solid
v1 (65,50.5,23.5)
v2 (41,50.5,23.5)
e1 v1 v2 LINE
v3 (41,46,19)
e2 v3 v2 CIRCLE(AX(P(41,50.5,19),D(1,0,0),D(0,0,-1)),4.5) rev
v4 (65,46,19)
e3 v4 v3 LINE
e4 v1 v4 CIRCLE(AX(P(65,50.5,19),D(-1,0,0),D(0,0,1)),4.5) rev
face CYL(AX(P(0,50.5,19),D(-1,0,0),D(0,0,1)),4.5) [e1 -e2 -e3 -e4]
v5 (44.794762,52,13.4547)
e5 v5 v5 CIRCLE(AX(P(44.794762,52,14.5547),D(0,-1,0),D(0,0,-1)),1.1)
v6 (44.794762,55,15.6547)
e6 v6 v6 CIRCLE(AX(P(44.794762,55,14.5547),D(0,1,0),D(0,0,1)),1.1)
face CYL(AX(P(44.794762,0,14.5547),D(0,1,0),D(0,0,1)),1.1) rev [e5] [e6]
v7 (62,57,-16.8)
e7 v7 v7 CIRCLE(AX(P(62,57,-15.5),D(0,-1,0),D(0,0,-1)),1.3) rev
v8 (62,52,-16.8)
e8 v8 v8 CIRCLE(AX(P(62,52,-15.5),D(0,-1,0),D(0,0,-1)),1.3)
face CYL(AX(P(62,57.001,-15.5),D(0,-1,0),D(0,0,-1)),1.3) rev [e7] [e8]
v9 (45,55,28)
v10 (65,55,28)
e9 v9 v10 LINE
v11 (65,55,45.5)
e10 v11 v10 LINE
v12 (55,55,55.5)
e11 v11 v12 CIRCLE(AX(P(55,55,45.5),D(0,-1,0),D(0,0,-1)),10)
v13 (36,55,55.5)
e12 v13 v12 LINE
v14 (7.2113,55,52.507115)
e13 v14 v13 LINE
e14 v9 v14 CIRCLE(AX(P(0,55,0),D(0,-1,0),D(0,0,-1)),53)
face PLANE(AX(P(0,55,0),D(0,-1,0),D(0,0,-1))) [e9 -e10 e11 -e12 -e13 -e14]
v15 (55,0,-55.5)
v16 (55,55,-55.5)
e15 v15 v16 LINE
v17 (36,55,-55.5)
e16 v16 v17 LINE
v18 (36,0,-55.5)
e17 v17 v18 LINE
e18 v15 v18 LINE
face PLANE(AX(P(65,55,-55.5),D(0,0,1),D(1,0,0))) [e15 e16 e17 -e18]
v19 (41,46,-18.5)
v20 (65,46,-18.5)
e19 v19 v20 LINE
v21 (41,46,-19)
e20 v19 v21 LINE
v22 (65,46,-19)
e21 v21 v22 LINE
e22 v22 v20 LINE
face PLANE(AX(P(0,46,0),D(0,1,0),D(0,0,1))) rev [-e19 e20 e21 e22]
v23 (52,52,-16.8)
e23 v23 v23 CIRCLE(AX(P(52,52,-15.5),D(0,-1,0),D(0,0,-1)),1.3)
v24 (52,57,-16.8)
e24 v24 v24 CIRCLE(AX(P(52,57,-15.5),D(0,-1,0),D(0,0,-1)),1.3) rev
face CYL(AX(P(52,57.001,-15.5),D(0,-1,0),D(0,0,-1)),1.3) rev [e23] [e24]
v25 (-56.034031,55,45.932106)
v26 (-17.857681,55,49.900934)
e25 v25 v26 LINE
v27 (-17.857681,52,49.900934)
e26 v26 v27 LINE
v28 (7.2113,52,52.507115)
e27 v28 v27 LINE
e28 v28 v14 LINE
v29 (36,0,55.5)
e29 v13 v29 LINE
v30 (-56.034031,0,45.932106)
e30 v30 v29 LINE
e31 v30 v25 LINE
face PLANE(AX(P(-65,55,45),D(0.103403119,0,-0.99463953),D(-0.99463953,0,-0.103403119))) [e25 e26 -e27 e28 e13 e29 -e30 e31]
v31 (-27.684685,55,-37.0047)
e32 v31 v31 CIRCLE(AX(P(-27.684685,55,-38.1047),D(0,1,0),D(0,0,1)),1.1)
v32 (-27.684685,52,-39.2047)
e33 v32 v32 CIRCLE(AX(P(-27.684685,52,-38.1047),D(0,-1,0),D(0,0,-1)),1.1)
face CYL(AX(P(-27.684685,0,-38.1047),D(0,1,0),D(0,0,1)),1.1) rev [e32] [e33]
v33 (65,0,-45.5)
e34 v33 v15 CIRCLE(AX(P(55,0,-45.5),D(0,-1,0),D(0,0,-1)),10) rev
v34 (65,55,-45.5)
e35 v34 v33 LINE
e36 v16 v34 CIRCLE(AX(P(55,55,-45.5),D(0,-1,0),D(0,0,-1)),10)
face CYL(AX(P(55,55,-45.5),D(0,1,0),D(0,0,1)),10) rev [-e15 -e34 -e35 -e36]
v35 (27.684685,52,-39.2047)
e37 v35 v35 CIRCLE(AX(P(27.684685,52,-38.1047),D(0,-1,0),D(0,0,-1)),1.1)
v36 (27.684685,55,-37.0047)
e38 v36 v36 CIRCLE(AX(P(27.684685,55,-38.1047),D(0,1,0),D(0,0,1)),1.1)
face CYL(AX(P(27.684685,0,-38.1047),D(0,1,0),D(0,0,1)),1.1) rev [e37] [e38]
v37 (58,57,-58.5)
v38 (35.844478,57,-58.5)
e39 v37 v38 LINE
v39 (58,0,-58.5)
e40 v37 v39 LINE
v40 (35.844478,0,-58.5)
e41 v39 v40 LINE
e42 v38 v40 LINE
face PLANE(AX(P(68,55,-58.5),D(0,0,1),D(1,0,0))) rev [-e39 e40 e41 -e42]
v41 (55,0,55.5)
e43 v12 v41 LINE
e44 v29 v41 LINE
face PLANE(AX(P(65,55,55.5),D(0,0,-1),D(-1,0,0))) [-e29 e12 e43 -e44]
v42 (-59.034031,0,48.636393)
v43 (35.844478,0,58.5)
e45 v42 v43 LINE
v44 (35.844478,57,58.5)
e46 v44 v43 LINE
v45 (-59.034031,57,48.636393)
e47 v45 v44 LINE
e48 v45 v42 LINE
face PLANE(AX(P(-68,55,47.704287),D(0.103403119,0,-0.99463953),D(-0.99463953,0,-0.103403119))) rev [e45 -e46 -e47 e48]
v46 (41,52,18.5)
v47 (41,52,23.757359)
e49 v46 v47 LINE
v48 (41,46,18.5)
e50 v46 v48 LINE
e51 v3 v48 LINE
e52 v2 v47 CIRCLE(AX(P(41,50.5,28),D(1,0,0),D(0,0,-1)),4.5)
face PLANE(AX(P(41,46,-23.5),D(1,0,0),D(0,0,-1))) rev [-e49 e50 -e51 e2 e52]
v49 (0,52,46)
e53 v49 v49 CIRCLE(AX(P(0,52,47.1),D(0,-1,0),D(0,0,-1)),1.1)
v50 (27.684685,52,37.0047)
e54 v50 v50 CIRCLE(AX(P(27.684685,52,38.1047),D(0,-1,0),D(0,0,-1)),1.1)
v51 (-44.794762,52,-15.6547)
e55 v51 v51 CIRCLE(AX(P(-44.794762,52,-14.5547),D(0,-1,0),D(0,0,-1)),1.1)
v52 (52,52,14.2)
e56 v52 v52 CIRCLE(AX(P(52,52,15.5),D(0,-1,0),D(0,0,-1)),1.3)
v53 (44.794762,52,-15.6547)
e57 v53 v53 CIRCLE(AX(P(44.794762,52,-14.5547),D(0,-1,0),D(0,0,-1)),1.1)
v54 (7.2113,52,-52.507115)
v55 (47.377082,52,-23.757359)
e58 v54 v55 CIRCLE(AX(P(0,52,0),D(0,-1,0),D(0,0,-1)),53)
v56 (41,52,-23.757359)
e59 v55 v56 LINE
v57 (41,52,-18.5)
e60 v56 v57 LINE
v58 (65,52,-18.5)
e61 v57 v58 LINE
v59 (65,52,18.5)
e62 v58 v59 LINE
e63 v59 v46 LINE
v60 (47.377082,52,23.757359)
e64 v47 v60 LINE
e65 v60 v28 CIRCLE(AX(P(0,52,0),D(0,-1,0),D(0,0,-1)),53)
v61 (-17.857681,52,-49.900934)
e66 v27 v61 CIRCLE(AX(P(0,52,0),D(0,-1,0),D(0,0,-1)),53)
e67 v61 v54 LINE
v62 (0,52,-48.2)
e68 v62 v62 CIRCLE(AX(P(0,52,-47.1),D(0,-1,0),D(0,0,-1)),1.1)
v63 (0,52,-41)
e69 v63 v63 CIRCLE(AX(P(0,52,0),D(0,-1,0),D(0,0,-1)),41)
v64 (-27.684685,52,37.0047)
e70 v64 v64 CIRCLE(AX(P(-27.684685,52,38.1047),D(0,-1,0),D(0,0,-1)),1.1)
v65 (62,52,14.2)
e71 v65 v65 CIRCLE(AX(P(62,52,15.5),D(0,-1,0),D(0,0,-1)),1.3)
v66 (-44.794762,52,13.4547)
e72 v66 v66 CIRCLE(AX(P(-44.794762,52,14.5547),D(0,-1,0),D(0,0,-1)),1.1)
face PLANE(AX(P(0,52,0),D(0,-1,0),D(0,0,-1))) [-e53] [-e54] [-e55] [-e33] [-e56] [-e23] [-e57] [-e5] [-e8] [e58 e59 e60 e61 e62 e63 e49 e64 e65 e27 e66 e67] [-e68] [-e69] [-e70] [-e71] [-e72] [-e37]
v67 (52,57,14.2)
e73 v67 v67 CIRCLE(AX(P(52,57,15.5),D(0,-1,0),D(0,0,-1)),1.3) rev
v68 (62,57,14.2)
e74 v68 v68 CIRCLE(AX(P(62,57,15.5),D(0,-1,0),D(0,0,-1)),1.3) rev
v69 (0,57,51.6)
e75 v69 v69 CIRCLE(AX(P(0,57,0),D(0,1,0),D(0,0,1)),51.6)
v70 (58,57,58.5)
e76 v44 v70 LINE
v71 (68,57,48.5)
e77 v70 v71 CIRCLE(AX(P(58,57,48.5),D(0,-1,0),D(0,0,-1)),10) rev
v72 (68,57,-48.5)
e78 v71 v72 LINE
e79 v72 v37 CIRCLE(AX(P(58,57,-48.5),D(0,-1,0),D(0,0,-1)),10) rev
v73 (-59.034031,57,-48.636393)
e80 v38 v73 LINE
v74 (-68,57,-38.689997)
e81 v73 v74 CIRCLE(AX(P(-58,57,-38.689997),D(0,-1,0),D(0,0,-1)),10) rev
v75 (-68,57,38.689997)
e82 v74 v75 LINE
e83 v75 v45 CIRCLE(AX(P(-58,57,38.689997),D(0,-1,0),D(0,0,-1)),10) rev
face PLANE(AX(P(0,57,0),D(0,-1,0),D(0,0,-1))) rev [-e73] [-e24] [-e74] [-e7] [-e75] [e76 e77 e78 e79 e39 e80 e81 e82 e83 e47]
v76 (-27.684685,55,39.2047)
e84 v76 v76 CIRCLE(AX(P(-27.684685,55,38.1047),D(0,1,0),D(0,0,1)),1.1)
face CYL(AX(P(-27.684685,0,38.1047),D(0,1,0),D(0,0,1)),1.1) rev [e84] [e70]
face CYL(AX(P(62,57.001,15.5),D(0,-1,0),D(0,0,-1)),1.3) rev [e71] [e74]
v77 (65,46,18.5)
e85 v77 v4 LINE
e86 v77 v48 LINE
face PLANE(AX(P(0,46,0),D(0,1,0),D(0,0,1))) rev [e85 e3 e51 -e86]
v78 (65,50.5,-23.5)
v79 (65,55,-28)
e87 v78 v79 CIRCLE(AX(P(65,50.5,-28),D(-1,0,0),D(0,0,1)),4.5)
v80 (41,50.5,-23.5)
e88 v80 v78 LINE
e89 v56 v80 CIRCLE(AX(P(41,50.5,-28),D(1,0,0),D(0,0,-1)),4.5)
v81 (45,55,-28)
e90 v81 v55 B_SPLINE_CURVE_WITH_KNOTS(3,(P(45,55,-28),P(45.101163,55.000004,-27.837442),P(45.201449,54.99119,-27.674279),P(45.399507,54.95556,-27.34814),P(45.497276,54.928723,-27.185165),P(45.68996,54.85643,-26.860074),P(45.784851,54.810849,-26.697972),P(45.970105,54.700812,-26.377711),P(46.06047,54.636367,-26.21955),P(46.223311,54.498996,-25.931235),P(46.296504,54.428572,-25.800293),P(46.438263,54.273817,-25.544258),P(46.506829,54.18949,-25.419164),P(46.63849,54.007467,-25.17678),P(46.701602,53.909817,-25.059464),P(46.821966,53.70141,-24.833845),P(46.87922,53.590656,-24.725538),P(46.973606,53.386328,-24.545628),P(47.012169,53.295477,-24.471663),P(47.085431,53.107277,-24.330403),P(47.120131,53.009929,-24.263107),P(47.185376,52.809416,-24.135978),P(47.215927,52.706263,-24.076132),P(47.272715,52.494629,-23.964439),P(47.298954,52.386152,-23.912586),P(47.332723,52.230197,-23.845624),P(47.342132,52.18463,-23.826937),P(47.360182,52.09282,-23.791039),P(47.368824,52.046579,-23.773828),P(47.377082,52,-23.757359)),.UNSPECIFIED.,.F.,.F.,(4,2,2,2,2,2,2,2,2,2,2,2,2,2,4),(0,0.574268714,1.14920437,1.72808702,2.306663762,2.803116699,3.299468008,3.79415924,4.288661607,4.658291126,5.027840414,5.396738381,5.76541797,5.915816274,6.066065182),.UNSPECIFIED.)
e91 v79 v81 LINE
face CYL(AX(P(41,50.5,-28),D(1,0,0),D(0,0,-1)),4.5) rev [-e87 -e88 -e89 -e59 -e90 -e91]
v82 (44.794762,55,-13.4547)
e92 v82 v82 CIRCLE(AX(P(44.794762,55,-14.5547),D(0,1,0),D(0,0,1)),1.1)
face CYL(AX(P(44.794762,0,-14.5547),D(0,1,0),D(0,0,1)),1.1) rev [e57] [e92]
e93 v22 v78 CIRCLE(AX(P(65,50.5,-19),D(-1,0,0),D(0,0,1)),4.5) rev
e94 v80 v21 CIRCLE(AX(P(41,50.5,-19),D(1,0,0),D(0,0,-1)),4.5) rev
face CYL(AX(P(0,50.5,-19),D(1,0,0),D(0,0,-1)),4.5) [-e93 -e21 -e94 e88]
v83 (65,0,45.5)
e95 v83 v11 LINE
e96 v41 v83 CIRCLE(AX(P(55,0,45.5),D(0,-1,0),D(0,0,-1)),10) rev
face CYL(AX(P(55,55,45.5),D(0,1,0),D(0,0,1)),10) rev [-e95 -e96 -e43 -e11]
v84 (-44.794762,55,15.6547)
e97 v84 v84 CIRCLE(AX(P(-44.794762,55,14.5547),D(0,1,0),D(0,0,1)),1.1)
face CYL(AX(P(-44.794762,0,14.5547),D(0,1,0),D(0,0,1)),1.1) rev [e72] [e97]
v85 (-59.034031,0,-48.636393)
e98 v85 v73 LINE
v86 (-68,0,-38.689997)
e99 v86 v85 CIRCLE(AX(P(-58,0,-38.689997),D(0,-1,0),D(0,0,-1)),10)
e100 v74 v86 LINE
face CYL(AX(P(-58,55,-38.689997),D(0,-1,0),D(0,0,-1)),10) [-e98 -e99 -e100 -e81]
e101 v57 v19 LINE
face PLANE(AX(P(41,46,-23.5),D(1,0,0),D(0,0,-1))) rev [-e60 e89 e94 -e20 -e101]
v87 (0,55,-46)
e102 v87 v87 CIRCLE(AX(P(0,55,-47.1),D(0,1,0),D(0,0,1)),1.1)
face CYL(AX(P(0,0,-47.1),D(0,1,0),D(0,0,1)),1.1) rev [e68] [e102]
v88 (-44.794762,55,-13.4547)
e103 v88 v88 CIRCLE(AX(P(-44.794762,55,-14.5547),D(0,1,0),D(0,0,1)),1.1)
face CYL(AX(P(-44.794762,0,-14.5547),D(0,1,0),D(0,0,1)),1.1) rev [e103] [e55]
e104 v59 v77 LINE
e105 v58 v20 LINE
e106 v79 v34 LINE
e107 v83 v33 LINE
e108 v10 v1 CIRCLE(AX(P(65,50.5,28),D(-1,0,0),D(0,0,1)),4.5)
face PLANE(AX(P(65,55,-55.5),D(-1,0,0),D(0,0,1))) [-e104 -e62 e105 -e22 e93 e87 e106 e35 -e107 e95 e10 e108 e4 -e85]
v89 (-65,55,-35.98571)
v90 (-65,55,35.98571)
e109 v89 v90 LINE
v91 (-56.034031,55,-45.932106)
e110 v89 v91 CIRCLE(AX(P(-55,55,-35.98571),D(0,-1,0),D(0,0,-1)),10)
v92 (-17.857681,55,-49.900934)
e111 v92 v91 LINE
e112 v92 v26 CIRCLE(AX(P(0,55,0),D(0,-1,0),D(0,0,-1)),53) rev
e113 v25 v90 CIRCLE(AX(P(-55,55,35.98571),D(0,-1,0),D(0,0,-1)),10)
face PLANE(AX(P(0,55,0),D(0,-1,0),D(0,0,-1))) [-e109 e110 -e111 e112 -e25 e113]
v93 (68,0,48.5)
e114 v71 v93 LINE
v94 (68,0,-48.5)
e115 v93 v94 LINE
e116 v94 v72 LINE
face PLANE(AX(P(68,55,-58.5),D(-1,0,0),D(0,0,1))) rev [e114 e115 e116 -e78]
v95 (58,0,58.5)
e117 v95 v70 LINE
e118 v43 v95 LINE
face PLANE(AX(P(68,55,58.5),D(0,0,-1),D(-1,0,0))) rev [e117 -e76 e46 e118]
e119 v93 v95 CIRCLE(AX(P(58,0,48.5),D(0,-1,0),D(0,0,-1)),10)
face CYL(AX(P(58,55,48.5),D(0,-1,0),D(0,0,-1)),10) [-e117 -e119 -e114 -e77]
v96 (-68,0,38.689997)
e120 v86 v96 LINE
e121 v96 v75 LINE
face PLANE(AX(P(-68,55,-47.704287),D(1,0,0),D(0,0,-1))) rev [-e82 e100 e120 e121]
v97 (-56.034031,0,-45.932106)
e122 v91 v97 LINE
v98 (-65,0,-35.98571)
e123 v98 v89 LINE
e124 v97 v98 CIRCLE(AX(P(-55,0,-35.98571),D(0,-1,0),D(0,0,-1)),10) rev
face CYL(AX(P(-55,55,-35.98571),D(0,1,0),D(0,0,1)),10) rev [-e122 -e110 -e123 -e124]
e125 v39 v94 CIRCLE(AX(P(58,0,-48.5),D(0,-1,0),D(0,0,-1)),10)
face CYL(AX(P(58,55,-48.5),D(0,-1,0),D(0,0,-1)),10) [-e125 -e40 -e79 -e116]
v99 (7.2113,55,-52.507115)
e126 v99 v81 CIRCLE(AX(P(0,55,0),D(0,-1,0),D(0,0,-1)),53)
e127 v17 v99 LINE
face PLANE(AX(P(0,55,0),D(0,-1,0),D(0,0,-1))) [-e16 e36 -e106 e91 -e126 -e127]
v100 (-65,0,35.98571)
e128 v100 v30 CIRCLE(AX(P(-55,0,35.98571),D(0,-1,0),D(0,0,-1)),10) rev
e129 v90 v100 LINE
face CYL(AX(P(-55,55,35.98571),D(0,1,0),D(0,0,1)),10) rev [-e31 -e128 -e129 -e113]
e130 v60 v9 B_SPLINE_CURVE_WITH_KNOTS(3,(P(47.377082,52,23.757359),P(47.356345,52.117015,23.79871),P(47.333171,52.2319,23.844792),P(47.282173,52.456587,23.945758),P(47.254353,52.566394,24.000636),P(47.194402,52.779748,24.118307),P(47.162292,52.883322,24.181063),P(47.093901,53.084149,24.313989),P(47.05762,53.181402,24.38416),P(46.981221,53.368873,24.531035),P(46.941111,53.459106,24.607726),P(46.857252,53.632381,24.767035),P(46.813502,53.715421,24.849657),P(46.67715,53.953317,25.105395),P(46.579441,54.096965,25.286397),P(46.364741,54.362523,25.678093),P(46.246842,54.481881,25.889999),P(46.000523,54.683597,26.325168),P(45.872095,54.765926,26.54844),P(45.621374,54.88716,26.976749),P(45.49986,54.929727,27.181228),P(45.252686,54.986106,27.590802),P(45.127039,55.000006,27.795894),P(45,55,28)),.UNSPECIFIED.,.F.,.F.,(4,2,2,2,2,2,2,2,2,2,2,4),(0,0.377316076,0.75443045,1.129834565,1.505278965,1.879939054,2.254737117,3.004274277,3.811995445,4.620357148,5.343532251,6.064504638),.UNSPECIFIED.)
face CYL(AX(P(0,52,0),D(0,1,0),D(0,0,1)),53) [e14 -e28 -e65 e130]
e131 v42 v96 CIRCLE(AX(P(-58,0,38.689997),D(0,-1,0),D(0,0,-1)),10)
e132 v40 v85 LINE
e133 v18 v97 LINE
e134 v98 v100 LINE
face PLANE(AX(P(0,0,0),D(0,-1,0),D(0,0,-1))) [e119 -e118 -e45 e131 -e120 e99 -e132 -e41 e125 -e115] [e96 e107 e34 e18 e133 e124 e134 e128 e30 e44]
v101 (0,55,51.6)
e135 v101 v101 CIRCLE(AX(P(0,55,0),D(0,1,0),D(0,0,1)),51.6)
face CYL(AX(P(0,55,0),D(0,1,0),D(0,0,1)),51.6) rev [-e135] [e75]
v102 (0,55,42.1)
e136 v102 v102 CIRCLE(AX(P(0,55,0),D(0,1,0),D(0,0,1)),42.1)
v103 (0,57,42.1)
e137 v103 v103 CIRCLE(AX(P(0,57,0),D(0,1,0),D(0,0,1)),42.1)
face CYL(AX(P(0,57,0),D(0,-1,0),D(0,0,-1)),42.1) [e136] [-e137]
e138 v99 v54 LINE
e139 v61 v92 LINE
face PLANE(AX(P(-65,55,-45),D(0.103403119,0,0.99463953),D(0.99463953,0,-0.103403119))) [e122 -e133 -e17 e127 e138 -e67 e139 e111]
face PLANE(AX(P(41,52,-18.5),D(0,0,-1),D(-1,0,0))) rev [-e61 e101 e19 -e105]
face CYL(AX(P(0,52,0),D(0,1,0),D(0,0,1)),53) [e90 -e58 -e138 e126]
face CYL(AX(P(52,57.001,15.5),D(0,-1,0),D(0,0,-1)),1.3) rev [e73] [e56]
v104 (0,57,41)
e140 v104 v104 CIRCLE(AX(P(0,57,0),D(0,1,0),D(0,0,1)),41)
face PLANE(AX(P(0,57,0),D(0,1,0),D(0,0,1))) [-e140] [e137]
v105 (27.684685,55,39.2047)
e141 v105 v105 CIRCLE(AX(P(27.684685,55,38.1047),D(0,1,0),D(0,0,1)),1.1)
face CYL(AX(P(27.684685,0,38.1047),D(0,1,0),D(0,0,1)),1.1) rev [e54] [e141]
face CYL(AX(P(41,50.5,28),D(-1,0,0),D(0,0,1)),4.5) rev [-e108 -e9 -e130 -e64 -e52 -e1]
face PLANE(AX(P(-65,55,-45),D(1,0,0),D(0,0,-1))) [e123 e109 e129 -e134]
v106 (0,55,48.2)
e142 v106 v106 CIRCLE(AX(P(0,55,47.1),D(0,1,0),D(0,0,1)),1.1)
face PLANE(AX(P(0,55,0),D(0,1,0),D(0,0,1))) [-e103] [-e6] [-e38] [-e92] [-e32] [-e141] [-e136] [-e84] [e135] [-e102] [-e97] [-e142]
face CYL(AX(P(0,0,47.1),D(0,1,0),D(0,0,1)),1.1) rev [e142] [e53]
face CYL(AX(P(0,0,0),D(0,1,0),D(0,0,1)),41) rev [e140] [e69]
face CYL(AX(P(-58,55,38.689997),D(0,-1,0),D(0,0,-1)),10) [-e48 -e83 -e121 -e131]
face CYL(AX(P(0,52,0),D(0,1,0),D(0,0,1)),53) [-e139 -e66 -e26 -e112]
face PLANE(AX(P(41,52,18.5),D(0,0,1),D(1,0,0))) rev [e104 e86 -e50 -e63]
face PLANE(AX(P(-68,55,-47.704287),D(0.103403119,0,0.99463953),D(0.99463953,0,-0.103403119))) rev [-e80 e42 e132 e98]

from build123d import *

# Parameters (mm, degrees)
EXTRUDE_1_DEPTH     = 55
EXTRUDE_2_DEPTH     = 2
SKETCH_3_R          = 53
EXTRUDE_3_DEPTH     = 3
SKETCH_4_R          = 51.6
CUT_EXTRUDE_1_DEPTH = 2
SKETCH_5_R          = 41
CUT_EXTRUDE_2_DEPTH = 106.220007603
EXTRUDE_START       = 2
SKETCH_6_R          = 42.1
SKETCH_6_R_2        = 41
EXTRUDE_4_DEPTH     = 2
SKETCH_9_W          = 24
SKETCH_9_H          = 47
EXTRUDE_6_DEPTH     = 9
SKETCH_10_W         = 24
SKETCH_10_H         = 37
CUT_EXTRUDE_6_DEPTH = 6
SKETCH_7_R          = 1.1
CUT_EXTRUDE_3_DEPTH = 106.220007603
FILLET_1_R          = 10
CUT_EXTRUDE_7_REACH = 105.683
SKETCH_11_R         = 1.3
FILLET_2_R          = 4.5


with BuildPart() as part:
    # 스케치1 → 보스-돌출1 (new body)
    with BuildSketch(Plane(origin=(0, 0, 0), x_dir=(1, 0, 0), z_dir=(0, 1, 0))):
        Polygon((-68, -47.70428689), (35.844478487, -58.5), (68, -58.5), (68, 58.5), (35.844478487, 58.5), (-68, 47.70428689), align=None)
        Polygon((-65, -45), (36, -55.5), (65, -55.5), (65, 55.5), (36, 55.5), (-65, 45), align=None, mode=Mode.SUBTRACT)
    extrude(amount=EXTRUDE_1_DEPTH)

    # 스케치2 → 보스-돌출2 (add)
    with BuildSketch(Plane(origin=(0, 55, 0), x_dir=(1, 0, 0), z_dir=(0, 1, 0))):
        Polygon((-68, 47.70428689), (35.844478487, 58.5), (68, 58.5), (68, -58.5), (35.844478487, -58.5), (-68, -47.70428689), align=None)
    extrude(amount=EXTRUDE_2_DEPTH)

    # 스케치3 → 보스-돌출3 (add)
    with BuildSketch(Plane.XZ.offset(-55)):
        Circle(SKETCH_3_R)
    extrude(amount=EXTRUDE_3_DEPTH)

    # 스케치4 → 컷-돌출1 (cut)
    with BuildSketch(Plane(origin=(0, 57, 0), x_dir=(1, 0, 0), z_dir=(0, 1, 0))):
        with Locations(Location((0, 0, 0), (0, 0, 270))):
            Circle(SKETCH_4_R)
    extrude(amount=-CUT_EXTRUDE_1_DEPTH, mode=Mode.SUBTRACT)

    # 스케치5 → 컷-돌출2 (cut, through all)
    with BuildSketch(Plane(origin=(0, 55, 0), x_dir=(1, 0, 0), z_dir=(0, 1, 0))):
        with Locations(Location((0, 0, 0), (0, 0, 270))):
            Circle(SKETCH_5_R)
    extrude(amount=-CUT_EXTRUDE_2_DEPTH, mode=Mode.SUBTRACT)

    # 스케치6 → 보스-돌출4 (add)
    with BuildSketch(Plane(origin=(0, 55, 0), x_dir=(1, 0, 0), z_dir=(0, 1, 0)).offset(EXTRUDE_START)):
        with Locations(Location((0, 0, 0), (0, 0, 270))):
            Circle(SKETCH_6_R)
        with Locations(Location((0, 0, 0), (0, 0, 270))):
            Circle(SKETCH_6_R_2, mode=Mode.SUBTRACT)
    extrude(amount=-EXTRUDE_4_DEPTH)

    # 스케치9 → 보스-돌출6 (add)
    with BuildSketch(Plane.XZ.offset(-55)):
        with Locations((53, 0)):
            Rectangle(SKETCH_9_W, SKETCH_9_H)
    extrude(amount=EXTRUDE_6_DEPTH)

    # 스케치10 → 컷-돌출6 (cut)
    with BuildSketch(Plane.XZ.offset(-46)):
        with Locations((53, 0)):
            Rectangle(SKETCH_10_W, SKETCH_10_H)
    extrude(amount=-CUT_EXTRUDE_6_DEPTH, mode=Mode.SUBTRACT)

    # 스케치7 → 컷-돌출3 (cut, through all)
    with BuildSketch(Plane(origin=(0, 55, 0), x_dir=(1, 0, 0), z_dir=(0, 1, 0))):
        with Locations(Location((0, 47.1, 0), (0, 0, 270))):
            Circle(SKETCH_7_R)
        with Locations(Location((27.684685383, 38.104700435, 0), (0, 0, 270))):
            Circle(SKETCH_7_R)
        with Locations(Location((44.794761918, 14.554700435, 0), (0, 0, 270))):
            Circle(SKETCH_7_R)
        with Locations(Location((44.794761918, -14.554700435, 0), (0, 0, 270))):
            Circle(SKETCH_7_R)
        with Locations(Location((27.684685383, -38.104700435, 0), (0, 0, 270))):
            Circle(SKETCH_7_R)
        with Locations(Location((0, -47.1, 0), (0, 0, 270))):
            Circle(SKETCH_7_R)
        with Locations(Location((-27.684685383, -38.104700435, 0), (0, 0, 270))):
            Circle(SKETCH_7_R)
        with Locations(Location((-44.794761918, -14.554700435, 0), (0, 0, 270))):
            Circle(SKETCH_7_R)
        with Locations(Location((-44.794761918, 14.554700435, 0), (0, 0, 270))):
            Circle(SKETCH_7_R)
        with Locations(Location((-27.684685383, 38.104700435, 0), (0, 0, 270))):
            Circle(SKETCH_7_R)
    extrude(amount=-CUT_EXTRUDE_3_DEPTH, mode=Mode.SUBTRACT)

    # 필렛1
    fillet_1_edges = [part.edges().sort_by_distance(p)[0] for p in [
        (-68, 28.5, -47.70428689),
        (68, 28.5, -58.5),
        (68, 28.5, 58.5),
        (-68, 28.5, 47.70428689),
        (-65, 27.5, -45),
        (-65, 27.5, 45),
        (65, 27.5, 55.5),
        (65, 27.5, -55.5),
    ]]
    fillet(fillet_1_edges, radius=FILLET_1_R)

    # 스케치11 → 컷-돌출7 (cut, up to next)
    with BuildSketch(Plane.XZ.offset(-52), mode=Mode.PRIVATE) as cut_extrude_7_sk1:
        with Locations(Location((52, 15.5, 0), (0, 0, 270))):
            Circle(SKETCH_11_R)
    cut_extrude_7_tool1 = extrude(cut_extrude_7_sk1.sketch, amount=-CUT_EXTRUDE_7_REACH, mode=Mode.PRIVATE) & part.part
    # 스케치11 → 컷-돌출7 (cut, up to next)
    with BuildSketch(Plane.XZ.offset(-52), mode=Mode.PRIVATE) as cut_extrude_7_sk2:
        with Locations(Location((52, -15.5, 0), (0, 0, 270))):
            Circle(SKETCH_11_R)
    cut_extrude_7_tool2 = extrude(cut_extrude_7_sk2.sketch, amount=-CUT_EXTRUDE_7_REACH, mode=Mode.PRIVATE) & part.part
    # 스케치11 → 컷-돌출7 (cut, up to next)
    with BuildSketch(Plane.XZ.offset(-52), mode=Mode.PRIVATE) as cut_extrude_7_sk3:
        with Locations(Location((62, 15.5, 0), (0, 0, 270))):
            Circle(SKETCH_11_R)
    cut_extrude_7_tool3 = extrude(cut_extrude_7_sk3.sketch, amount=-CUT_EXTRUDE_7_REACH, mode=Mode.PRIVATE) & part.part
    # 스케치11 → 컷-돌출7 (cut, up to next)
    with BuildSketch(Plane.XZ.offset(-52), mode=Mode.PRIVATE) as cut_extrude_7_sk4:
        with Locations(Location((62, -15.5, 0), (0, 0, 270))):
            Circle(SKETCH_11_R)
    cut_extrude_7_tool4 = extrude(cut_extrude_7_sk4.sketch, amount=-CUT_EXTRUDE_7_REACH, mode=Mode.PRIVATE) & part.part
    add(cut_extrude_7_tool1.solids().sort_by_distance((52, 52, 15.5))[0], mode=Mode.SUBTRACT)
    add(cut_extrude_7_tool2.solids().sort_by_distance((52, 52, -15.5))[0], mode=Mode.SUBTRACT)
    add(cut_extrude_7_tool3.solids().sort_by_distance((62, 52, 15.5))[0], mode=Mode.SUBTRACT)
    add(cut_extrude_7_tool4.solids().sort_by_distance((62, 52, -15.5))[0], mode=Mode.SUBTRACT)

    # 필렛2
    fillet_2_edges = [part.edges().sort_by_distance(p)[0] for p in [
        (53, 46, 23.5),
        (53, 46, -23.5),
        (56.252631433, 55, -23.5),
        (56.252631433, 55, 23.5),
    ]]
    fillet(fillet_2_edges, radius=FILLET_2_R - 0.0001)  # a hair under: the kernel refuses the full size


solid = part.part
